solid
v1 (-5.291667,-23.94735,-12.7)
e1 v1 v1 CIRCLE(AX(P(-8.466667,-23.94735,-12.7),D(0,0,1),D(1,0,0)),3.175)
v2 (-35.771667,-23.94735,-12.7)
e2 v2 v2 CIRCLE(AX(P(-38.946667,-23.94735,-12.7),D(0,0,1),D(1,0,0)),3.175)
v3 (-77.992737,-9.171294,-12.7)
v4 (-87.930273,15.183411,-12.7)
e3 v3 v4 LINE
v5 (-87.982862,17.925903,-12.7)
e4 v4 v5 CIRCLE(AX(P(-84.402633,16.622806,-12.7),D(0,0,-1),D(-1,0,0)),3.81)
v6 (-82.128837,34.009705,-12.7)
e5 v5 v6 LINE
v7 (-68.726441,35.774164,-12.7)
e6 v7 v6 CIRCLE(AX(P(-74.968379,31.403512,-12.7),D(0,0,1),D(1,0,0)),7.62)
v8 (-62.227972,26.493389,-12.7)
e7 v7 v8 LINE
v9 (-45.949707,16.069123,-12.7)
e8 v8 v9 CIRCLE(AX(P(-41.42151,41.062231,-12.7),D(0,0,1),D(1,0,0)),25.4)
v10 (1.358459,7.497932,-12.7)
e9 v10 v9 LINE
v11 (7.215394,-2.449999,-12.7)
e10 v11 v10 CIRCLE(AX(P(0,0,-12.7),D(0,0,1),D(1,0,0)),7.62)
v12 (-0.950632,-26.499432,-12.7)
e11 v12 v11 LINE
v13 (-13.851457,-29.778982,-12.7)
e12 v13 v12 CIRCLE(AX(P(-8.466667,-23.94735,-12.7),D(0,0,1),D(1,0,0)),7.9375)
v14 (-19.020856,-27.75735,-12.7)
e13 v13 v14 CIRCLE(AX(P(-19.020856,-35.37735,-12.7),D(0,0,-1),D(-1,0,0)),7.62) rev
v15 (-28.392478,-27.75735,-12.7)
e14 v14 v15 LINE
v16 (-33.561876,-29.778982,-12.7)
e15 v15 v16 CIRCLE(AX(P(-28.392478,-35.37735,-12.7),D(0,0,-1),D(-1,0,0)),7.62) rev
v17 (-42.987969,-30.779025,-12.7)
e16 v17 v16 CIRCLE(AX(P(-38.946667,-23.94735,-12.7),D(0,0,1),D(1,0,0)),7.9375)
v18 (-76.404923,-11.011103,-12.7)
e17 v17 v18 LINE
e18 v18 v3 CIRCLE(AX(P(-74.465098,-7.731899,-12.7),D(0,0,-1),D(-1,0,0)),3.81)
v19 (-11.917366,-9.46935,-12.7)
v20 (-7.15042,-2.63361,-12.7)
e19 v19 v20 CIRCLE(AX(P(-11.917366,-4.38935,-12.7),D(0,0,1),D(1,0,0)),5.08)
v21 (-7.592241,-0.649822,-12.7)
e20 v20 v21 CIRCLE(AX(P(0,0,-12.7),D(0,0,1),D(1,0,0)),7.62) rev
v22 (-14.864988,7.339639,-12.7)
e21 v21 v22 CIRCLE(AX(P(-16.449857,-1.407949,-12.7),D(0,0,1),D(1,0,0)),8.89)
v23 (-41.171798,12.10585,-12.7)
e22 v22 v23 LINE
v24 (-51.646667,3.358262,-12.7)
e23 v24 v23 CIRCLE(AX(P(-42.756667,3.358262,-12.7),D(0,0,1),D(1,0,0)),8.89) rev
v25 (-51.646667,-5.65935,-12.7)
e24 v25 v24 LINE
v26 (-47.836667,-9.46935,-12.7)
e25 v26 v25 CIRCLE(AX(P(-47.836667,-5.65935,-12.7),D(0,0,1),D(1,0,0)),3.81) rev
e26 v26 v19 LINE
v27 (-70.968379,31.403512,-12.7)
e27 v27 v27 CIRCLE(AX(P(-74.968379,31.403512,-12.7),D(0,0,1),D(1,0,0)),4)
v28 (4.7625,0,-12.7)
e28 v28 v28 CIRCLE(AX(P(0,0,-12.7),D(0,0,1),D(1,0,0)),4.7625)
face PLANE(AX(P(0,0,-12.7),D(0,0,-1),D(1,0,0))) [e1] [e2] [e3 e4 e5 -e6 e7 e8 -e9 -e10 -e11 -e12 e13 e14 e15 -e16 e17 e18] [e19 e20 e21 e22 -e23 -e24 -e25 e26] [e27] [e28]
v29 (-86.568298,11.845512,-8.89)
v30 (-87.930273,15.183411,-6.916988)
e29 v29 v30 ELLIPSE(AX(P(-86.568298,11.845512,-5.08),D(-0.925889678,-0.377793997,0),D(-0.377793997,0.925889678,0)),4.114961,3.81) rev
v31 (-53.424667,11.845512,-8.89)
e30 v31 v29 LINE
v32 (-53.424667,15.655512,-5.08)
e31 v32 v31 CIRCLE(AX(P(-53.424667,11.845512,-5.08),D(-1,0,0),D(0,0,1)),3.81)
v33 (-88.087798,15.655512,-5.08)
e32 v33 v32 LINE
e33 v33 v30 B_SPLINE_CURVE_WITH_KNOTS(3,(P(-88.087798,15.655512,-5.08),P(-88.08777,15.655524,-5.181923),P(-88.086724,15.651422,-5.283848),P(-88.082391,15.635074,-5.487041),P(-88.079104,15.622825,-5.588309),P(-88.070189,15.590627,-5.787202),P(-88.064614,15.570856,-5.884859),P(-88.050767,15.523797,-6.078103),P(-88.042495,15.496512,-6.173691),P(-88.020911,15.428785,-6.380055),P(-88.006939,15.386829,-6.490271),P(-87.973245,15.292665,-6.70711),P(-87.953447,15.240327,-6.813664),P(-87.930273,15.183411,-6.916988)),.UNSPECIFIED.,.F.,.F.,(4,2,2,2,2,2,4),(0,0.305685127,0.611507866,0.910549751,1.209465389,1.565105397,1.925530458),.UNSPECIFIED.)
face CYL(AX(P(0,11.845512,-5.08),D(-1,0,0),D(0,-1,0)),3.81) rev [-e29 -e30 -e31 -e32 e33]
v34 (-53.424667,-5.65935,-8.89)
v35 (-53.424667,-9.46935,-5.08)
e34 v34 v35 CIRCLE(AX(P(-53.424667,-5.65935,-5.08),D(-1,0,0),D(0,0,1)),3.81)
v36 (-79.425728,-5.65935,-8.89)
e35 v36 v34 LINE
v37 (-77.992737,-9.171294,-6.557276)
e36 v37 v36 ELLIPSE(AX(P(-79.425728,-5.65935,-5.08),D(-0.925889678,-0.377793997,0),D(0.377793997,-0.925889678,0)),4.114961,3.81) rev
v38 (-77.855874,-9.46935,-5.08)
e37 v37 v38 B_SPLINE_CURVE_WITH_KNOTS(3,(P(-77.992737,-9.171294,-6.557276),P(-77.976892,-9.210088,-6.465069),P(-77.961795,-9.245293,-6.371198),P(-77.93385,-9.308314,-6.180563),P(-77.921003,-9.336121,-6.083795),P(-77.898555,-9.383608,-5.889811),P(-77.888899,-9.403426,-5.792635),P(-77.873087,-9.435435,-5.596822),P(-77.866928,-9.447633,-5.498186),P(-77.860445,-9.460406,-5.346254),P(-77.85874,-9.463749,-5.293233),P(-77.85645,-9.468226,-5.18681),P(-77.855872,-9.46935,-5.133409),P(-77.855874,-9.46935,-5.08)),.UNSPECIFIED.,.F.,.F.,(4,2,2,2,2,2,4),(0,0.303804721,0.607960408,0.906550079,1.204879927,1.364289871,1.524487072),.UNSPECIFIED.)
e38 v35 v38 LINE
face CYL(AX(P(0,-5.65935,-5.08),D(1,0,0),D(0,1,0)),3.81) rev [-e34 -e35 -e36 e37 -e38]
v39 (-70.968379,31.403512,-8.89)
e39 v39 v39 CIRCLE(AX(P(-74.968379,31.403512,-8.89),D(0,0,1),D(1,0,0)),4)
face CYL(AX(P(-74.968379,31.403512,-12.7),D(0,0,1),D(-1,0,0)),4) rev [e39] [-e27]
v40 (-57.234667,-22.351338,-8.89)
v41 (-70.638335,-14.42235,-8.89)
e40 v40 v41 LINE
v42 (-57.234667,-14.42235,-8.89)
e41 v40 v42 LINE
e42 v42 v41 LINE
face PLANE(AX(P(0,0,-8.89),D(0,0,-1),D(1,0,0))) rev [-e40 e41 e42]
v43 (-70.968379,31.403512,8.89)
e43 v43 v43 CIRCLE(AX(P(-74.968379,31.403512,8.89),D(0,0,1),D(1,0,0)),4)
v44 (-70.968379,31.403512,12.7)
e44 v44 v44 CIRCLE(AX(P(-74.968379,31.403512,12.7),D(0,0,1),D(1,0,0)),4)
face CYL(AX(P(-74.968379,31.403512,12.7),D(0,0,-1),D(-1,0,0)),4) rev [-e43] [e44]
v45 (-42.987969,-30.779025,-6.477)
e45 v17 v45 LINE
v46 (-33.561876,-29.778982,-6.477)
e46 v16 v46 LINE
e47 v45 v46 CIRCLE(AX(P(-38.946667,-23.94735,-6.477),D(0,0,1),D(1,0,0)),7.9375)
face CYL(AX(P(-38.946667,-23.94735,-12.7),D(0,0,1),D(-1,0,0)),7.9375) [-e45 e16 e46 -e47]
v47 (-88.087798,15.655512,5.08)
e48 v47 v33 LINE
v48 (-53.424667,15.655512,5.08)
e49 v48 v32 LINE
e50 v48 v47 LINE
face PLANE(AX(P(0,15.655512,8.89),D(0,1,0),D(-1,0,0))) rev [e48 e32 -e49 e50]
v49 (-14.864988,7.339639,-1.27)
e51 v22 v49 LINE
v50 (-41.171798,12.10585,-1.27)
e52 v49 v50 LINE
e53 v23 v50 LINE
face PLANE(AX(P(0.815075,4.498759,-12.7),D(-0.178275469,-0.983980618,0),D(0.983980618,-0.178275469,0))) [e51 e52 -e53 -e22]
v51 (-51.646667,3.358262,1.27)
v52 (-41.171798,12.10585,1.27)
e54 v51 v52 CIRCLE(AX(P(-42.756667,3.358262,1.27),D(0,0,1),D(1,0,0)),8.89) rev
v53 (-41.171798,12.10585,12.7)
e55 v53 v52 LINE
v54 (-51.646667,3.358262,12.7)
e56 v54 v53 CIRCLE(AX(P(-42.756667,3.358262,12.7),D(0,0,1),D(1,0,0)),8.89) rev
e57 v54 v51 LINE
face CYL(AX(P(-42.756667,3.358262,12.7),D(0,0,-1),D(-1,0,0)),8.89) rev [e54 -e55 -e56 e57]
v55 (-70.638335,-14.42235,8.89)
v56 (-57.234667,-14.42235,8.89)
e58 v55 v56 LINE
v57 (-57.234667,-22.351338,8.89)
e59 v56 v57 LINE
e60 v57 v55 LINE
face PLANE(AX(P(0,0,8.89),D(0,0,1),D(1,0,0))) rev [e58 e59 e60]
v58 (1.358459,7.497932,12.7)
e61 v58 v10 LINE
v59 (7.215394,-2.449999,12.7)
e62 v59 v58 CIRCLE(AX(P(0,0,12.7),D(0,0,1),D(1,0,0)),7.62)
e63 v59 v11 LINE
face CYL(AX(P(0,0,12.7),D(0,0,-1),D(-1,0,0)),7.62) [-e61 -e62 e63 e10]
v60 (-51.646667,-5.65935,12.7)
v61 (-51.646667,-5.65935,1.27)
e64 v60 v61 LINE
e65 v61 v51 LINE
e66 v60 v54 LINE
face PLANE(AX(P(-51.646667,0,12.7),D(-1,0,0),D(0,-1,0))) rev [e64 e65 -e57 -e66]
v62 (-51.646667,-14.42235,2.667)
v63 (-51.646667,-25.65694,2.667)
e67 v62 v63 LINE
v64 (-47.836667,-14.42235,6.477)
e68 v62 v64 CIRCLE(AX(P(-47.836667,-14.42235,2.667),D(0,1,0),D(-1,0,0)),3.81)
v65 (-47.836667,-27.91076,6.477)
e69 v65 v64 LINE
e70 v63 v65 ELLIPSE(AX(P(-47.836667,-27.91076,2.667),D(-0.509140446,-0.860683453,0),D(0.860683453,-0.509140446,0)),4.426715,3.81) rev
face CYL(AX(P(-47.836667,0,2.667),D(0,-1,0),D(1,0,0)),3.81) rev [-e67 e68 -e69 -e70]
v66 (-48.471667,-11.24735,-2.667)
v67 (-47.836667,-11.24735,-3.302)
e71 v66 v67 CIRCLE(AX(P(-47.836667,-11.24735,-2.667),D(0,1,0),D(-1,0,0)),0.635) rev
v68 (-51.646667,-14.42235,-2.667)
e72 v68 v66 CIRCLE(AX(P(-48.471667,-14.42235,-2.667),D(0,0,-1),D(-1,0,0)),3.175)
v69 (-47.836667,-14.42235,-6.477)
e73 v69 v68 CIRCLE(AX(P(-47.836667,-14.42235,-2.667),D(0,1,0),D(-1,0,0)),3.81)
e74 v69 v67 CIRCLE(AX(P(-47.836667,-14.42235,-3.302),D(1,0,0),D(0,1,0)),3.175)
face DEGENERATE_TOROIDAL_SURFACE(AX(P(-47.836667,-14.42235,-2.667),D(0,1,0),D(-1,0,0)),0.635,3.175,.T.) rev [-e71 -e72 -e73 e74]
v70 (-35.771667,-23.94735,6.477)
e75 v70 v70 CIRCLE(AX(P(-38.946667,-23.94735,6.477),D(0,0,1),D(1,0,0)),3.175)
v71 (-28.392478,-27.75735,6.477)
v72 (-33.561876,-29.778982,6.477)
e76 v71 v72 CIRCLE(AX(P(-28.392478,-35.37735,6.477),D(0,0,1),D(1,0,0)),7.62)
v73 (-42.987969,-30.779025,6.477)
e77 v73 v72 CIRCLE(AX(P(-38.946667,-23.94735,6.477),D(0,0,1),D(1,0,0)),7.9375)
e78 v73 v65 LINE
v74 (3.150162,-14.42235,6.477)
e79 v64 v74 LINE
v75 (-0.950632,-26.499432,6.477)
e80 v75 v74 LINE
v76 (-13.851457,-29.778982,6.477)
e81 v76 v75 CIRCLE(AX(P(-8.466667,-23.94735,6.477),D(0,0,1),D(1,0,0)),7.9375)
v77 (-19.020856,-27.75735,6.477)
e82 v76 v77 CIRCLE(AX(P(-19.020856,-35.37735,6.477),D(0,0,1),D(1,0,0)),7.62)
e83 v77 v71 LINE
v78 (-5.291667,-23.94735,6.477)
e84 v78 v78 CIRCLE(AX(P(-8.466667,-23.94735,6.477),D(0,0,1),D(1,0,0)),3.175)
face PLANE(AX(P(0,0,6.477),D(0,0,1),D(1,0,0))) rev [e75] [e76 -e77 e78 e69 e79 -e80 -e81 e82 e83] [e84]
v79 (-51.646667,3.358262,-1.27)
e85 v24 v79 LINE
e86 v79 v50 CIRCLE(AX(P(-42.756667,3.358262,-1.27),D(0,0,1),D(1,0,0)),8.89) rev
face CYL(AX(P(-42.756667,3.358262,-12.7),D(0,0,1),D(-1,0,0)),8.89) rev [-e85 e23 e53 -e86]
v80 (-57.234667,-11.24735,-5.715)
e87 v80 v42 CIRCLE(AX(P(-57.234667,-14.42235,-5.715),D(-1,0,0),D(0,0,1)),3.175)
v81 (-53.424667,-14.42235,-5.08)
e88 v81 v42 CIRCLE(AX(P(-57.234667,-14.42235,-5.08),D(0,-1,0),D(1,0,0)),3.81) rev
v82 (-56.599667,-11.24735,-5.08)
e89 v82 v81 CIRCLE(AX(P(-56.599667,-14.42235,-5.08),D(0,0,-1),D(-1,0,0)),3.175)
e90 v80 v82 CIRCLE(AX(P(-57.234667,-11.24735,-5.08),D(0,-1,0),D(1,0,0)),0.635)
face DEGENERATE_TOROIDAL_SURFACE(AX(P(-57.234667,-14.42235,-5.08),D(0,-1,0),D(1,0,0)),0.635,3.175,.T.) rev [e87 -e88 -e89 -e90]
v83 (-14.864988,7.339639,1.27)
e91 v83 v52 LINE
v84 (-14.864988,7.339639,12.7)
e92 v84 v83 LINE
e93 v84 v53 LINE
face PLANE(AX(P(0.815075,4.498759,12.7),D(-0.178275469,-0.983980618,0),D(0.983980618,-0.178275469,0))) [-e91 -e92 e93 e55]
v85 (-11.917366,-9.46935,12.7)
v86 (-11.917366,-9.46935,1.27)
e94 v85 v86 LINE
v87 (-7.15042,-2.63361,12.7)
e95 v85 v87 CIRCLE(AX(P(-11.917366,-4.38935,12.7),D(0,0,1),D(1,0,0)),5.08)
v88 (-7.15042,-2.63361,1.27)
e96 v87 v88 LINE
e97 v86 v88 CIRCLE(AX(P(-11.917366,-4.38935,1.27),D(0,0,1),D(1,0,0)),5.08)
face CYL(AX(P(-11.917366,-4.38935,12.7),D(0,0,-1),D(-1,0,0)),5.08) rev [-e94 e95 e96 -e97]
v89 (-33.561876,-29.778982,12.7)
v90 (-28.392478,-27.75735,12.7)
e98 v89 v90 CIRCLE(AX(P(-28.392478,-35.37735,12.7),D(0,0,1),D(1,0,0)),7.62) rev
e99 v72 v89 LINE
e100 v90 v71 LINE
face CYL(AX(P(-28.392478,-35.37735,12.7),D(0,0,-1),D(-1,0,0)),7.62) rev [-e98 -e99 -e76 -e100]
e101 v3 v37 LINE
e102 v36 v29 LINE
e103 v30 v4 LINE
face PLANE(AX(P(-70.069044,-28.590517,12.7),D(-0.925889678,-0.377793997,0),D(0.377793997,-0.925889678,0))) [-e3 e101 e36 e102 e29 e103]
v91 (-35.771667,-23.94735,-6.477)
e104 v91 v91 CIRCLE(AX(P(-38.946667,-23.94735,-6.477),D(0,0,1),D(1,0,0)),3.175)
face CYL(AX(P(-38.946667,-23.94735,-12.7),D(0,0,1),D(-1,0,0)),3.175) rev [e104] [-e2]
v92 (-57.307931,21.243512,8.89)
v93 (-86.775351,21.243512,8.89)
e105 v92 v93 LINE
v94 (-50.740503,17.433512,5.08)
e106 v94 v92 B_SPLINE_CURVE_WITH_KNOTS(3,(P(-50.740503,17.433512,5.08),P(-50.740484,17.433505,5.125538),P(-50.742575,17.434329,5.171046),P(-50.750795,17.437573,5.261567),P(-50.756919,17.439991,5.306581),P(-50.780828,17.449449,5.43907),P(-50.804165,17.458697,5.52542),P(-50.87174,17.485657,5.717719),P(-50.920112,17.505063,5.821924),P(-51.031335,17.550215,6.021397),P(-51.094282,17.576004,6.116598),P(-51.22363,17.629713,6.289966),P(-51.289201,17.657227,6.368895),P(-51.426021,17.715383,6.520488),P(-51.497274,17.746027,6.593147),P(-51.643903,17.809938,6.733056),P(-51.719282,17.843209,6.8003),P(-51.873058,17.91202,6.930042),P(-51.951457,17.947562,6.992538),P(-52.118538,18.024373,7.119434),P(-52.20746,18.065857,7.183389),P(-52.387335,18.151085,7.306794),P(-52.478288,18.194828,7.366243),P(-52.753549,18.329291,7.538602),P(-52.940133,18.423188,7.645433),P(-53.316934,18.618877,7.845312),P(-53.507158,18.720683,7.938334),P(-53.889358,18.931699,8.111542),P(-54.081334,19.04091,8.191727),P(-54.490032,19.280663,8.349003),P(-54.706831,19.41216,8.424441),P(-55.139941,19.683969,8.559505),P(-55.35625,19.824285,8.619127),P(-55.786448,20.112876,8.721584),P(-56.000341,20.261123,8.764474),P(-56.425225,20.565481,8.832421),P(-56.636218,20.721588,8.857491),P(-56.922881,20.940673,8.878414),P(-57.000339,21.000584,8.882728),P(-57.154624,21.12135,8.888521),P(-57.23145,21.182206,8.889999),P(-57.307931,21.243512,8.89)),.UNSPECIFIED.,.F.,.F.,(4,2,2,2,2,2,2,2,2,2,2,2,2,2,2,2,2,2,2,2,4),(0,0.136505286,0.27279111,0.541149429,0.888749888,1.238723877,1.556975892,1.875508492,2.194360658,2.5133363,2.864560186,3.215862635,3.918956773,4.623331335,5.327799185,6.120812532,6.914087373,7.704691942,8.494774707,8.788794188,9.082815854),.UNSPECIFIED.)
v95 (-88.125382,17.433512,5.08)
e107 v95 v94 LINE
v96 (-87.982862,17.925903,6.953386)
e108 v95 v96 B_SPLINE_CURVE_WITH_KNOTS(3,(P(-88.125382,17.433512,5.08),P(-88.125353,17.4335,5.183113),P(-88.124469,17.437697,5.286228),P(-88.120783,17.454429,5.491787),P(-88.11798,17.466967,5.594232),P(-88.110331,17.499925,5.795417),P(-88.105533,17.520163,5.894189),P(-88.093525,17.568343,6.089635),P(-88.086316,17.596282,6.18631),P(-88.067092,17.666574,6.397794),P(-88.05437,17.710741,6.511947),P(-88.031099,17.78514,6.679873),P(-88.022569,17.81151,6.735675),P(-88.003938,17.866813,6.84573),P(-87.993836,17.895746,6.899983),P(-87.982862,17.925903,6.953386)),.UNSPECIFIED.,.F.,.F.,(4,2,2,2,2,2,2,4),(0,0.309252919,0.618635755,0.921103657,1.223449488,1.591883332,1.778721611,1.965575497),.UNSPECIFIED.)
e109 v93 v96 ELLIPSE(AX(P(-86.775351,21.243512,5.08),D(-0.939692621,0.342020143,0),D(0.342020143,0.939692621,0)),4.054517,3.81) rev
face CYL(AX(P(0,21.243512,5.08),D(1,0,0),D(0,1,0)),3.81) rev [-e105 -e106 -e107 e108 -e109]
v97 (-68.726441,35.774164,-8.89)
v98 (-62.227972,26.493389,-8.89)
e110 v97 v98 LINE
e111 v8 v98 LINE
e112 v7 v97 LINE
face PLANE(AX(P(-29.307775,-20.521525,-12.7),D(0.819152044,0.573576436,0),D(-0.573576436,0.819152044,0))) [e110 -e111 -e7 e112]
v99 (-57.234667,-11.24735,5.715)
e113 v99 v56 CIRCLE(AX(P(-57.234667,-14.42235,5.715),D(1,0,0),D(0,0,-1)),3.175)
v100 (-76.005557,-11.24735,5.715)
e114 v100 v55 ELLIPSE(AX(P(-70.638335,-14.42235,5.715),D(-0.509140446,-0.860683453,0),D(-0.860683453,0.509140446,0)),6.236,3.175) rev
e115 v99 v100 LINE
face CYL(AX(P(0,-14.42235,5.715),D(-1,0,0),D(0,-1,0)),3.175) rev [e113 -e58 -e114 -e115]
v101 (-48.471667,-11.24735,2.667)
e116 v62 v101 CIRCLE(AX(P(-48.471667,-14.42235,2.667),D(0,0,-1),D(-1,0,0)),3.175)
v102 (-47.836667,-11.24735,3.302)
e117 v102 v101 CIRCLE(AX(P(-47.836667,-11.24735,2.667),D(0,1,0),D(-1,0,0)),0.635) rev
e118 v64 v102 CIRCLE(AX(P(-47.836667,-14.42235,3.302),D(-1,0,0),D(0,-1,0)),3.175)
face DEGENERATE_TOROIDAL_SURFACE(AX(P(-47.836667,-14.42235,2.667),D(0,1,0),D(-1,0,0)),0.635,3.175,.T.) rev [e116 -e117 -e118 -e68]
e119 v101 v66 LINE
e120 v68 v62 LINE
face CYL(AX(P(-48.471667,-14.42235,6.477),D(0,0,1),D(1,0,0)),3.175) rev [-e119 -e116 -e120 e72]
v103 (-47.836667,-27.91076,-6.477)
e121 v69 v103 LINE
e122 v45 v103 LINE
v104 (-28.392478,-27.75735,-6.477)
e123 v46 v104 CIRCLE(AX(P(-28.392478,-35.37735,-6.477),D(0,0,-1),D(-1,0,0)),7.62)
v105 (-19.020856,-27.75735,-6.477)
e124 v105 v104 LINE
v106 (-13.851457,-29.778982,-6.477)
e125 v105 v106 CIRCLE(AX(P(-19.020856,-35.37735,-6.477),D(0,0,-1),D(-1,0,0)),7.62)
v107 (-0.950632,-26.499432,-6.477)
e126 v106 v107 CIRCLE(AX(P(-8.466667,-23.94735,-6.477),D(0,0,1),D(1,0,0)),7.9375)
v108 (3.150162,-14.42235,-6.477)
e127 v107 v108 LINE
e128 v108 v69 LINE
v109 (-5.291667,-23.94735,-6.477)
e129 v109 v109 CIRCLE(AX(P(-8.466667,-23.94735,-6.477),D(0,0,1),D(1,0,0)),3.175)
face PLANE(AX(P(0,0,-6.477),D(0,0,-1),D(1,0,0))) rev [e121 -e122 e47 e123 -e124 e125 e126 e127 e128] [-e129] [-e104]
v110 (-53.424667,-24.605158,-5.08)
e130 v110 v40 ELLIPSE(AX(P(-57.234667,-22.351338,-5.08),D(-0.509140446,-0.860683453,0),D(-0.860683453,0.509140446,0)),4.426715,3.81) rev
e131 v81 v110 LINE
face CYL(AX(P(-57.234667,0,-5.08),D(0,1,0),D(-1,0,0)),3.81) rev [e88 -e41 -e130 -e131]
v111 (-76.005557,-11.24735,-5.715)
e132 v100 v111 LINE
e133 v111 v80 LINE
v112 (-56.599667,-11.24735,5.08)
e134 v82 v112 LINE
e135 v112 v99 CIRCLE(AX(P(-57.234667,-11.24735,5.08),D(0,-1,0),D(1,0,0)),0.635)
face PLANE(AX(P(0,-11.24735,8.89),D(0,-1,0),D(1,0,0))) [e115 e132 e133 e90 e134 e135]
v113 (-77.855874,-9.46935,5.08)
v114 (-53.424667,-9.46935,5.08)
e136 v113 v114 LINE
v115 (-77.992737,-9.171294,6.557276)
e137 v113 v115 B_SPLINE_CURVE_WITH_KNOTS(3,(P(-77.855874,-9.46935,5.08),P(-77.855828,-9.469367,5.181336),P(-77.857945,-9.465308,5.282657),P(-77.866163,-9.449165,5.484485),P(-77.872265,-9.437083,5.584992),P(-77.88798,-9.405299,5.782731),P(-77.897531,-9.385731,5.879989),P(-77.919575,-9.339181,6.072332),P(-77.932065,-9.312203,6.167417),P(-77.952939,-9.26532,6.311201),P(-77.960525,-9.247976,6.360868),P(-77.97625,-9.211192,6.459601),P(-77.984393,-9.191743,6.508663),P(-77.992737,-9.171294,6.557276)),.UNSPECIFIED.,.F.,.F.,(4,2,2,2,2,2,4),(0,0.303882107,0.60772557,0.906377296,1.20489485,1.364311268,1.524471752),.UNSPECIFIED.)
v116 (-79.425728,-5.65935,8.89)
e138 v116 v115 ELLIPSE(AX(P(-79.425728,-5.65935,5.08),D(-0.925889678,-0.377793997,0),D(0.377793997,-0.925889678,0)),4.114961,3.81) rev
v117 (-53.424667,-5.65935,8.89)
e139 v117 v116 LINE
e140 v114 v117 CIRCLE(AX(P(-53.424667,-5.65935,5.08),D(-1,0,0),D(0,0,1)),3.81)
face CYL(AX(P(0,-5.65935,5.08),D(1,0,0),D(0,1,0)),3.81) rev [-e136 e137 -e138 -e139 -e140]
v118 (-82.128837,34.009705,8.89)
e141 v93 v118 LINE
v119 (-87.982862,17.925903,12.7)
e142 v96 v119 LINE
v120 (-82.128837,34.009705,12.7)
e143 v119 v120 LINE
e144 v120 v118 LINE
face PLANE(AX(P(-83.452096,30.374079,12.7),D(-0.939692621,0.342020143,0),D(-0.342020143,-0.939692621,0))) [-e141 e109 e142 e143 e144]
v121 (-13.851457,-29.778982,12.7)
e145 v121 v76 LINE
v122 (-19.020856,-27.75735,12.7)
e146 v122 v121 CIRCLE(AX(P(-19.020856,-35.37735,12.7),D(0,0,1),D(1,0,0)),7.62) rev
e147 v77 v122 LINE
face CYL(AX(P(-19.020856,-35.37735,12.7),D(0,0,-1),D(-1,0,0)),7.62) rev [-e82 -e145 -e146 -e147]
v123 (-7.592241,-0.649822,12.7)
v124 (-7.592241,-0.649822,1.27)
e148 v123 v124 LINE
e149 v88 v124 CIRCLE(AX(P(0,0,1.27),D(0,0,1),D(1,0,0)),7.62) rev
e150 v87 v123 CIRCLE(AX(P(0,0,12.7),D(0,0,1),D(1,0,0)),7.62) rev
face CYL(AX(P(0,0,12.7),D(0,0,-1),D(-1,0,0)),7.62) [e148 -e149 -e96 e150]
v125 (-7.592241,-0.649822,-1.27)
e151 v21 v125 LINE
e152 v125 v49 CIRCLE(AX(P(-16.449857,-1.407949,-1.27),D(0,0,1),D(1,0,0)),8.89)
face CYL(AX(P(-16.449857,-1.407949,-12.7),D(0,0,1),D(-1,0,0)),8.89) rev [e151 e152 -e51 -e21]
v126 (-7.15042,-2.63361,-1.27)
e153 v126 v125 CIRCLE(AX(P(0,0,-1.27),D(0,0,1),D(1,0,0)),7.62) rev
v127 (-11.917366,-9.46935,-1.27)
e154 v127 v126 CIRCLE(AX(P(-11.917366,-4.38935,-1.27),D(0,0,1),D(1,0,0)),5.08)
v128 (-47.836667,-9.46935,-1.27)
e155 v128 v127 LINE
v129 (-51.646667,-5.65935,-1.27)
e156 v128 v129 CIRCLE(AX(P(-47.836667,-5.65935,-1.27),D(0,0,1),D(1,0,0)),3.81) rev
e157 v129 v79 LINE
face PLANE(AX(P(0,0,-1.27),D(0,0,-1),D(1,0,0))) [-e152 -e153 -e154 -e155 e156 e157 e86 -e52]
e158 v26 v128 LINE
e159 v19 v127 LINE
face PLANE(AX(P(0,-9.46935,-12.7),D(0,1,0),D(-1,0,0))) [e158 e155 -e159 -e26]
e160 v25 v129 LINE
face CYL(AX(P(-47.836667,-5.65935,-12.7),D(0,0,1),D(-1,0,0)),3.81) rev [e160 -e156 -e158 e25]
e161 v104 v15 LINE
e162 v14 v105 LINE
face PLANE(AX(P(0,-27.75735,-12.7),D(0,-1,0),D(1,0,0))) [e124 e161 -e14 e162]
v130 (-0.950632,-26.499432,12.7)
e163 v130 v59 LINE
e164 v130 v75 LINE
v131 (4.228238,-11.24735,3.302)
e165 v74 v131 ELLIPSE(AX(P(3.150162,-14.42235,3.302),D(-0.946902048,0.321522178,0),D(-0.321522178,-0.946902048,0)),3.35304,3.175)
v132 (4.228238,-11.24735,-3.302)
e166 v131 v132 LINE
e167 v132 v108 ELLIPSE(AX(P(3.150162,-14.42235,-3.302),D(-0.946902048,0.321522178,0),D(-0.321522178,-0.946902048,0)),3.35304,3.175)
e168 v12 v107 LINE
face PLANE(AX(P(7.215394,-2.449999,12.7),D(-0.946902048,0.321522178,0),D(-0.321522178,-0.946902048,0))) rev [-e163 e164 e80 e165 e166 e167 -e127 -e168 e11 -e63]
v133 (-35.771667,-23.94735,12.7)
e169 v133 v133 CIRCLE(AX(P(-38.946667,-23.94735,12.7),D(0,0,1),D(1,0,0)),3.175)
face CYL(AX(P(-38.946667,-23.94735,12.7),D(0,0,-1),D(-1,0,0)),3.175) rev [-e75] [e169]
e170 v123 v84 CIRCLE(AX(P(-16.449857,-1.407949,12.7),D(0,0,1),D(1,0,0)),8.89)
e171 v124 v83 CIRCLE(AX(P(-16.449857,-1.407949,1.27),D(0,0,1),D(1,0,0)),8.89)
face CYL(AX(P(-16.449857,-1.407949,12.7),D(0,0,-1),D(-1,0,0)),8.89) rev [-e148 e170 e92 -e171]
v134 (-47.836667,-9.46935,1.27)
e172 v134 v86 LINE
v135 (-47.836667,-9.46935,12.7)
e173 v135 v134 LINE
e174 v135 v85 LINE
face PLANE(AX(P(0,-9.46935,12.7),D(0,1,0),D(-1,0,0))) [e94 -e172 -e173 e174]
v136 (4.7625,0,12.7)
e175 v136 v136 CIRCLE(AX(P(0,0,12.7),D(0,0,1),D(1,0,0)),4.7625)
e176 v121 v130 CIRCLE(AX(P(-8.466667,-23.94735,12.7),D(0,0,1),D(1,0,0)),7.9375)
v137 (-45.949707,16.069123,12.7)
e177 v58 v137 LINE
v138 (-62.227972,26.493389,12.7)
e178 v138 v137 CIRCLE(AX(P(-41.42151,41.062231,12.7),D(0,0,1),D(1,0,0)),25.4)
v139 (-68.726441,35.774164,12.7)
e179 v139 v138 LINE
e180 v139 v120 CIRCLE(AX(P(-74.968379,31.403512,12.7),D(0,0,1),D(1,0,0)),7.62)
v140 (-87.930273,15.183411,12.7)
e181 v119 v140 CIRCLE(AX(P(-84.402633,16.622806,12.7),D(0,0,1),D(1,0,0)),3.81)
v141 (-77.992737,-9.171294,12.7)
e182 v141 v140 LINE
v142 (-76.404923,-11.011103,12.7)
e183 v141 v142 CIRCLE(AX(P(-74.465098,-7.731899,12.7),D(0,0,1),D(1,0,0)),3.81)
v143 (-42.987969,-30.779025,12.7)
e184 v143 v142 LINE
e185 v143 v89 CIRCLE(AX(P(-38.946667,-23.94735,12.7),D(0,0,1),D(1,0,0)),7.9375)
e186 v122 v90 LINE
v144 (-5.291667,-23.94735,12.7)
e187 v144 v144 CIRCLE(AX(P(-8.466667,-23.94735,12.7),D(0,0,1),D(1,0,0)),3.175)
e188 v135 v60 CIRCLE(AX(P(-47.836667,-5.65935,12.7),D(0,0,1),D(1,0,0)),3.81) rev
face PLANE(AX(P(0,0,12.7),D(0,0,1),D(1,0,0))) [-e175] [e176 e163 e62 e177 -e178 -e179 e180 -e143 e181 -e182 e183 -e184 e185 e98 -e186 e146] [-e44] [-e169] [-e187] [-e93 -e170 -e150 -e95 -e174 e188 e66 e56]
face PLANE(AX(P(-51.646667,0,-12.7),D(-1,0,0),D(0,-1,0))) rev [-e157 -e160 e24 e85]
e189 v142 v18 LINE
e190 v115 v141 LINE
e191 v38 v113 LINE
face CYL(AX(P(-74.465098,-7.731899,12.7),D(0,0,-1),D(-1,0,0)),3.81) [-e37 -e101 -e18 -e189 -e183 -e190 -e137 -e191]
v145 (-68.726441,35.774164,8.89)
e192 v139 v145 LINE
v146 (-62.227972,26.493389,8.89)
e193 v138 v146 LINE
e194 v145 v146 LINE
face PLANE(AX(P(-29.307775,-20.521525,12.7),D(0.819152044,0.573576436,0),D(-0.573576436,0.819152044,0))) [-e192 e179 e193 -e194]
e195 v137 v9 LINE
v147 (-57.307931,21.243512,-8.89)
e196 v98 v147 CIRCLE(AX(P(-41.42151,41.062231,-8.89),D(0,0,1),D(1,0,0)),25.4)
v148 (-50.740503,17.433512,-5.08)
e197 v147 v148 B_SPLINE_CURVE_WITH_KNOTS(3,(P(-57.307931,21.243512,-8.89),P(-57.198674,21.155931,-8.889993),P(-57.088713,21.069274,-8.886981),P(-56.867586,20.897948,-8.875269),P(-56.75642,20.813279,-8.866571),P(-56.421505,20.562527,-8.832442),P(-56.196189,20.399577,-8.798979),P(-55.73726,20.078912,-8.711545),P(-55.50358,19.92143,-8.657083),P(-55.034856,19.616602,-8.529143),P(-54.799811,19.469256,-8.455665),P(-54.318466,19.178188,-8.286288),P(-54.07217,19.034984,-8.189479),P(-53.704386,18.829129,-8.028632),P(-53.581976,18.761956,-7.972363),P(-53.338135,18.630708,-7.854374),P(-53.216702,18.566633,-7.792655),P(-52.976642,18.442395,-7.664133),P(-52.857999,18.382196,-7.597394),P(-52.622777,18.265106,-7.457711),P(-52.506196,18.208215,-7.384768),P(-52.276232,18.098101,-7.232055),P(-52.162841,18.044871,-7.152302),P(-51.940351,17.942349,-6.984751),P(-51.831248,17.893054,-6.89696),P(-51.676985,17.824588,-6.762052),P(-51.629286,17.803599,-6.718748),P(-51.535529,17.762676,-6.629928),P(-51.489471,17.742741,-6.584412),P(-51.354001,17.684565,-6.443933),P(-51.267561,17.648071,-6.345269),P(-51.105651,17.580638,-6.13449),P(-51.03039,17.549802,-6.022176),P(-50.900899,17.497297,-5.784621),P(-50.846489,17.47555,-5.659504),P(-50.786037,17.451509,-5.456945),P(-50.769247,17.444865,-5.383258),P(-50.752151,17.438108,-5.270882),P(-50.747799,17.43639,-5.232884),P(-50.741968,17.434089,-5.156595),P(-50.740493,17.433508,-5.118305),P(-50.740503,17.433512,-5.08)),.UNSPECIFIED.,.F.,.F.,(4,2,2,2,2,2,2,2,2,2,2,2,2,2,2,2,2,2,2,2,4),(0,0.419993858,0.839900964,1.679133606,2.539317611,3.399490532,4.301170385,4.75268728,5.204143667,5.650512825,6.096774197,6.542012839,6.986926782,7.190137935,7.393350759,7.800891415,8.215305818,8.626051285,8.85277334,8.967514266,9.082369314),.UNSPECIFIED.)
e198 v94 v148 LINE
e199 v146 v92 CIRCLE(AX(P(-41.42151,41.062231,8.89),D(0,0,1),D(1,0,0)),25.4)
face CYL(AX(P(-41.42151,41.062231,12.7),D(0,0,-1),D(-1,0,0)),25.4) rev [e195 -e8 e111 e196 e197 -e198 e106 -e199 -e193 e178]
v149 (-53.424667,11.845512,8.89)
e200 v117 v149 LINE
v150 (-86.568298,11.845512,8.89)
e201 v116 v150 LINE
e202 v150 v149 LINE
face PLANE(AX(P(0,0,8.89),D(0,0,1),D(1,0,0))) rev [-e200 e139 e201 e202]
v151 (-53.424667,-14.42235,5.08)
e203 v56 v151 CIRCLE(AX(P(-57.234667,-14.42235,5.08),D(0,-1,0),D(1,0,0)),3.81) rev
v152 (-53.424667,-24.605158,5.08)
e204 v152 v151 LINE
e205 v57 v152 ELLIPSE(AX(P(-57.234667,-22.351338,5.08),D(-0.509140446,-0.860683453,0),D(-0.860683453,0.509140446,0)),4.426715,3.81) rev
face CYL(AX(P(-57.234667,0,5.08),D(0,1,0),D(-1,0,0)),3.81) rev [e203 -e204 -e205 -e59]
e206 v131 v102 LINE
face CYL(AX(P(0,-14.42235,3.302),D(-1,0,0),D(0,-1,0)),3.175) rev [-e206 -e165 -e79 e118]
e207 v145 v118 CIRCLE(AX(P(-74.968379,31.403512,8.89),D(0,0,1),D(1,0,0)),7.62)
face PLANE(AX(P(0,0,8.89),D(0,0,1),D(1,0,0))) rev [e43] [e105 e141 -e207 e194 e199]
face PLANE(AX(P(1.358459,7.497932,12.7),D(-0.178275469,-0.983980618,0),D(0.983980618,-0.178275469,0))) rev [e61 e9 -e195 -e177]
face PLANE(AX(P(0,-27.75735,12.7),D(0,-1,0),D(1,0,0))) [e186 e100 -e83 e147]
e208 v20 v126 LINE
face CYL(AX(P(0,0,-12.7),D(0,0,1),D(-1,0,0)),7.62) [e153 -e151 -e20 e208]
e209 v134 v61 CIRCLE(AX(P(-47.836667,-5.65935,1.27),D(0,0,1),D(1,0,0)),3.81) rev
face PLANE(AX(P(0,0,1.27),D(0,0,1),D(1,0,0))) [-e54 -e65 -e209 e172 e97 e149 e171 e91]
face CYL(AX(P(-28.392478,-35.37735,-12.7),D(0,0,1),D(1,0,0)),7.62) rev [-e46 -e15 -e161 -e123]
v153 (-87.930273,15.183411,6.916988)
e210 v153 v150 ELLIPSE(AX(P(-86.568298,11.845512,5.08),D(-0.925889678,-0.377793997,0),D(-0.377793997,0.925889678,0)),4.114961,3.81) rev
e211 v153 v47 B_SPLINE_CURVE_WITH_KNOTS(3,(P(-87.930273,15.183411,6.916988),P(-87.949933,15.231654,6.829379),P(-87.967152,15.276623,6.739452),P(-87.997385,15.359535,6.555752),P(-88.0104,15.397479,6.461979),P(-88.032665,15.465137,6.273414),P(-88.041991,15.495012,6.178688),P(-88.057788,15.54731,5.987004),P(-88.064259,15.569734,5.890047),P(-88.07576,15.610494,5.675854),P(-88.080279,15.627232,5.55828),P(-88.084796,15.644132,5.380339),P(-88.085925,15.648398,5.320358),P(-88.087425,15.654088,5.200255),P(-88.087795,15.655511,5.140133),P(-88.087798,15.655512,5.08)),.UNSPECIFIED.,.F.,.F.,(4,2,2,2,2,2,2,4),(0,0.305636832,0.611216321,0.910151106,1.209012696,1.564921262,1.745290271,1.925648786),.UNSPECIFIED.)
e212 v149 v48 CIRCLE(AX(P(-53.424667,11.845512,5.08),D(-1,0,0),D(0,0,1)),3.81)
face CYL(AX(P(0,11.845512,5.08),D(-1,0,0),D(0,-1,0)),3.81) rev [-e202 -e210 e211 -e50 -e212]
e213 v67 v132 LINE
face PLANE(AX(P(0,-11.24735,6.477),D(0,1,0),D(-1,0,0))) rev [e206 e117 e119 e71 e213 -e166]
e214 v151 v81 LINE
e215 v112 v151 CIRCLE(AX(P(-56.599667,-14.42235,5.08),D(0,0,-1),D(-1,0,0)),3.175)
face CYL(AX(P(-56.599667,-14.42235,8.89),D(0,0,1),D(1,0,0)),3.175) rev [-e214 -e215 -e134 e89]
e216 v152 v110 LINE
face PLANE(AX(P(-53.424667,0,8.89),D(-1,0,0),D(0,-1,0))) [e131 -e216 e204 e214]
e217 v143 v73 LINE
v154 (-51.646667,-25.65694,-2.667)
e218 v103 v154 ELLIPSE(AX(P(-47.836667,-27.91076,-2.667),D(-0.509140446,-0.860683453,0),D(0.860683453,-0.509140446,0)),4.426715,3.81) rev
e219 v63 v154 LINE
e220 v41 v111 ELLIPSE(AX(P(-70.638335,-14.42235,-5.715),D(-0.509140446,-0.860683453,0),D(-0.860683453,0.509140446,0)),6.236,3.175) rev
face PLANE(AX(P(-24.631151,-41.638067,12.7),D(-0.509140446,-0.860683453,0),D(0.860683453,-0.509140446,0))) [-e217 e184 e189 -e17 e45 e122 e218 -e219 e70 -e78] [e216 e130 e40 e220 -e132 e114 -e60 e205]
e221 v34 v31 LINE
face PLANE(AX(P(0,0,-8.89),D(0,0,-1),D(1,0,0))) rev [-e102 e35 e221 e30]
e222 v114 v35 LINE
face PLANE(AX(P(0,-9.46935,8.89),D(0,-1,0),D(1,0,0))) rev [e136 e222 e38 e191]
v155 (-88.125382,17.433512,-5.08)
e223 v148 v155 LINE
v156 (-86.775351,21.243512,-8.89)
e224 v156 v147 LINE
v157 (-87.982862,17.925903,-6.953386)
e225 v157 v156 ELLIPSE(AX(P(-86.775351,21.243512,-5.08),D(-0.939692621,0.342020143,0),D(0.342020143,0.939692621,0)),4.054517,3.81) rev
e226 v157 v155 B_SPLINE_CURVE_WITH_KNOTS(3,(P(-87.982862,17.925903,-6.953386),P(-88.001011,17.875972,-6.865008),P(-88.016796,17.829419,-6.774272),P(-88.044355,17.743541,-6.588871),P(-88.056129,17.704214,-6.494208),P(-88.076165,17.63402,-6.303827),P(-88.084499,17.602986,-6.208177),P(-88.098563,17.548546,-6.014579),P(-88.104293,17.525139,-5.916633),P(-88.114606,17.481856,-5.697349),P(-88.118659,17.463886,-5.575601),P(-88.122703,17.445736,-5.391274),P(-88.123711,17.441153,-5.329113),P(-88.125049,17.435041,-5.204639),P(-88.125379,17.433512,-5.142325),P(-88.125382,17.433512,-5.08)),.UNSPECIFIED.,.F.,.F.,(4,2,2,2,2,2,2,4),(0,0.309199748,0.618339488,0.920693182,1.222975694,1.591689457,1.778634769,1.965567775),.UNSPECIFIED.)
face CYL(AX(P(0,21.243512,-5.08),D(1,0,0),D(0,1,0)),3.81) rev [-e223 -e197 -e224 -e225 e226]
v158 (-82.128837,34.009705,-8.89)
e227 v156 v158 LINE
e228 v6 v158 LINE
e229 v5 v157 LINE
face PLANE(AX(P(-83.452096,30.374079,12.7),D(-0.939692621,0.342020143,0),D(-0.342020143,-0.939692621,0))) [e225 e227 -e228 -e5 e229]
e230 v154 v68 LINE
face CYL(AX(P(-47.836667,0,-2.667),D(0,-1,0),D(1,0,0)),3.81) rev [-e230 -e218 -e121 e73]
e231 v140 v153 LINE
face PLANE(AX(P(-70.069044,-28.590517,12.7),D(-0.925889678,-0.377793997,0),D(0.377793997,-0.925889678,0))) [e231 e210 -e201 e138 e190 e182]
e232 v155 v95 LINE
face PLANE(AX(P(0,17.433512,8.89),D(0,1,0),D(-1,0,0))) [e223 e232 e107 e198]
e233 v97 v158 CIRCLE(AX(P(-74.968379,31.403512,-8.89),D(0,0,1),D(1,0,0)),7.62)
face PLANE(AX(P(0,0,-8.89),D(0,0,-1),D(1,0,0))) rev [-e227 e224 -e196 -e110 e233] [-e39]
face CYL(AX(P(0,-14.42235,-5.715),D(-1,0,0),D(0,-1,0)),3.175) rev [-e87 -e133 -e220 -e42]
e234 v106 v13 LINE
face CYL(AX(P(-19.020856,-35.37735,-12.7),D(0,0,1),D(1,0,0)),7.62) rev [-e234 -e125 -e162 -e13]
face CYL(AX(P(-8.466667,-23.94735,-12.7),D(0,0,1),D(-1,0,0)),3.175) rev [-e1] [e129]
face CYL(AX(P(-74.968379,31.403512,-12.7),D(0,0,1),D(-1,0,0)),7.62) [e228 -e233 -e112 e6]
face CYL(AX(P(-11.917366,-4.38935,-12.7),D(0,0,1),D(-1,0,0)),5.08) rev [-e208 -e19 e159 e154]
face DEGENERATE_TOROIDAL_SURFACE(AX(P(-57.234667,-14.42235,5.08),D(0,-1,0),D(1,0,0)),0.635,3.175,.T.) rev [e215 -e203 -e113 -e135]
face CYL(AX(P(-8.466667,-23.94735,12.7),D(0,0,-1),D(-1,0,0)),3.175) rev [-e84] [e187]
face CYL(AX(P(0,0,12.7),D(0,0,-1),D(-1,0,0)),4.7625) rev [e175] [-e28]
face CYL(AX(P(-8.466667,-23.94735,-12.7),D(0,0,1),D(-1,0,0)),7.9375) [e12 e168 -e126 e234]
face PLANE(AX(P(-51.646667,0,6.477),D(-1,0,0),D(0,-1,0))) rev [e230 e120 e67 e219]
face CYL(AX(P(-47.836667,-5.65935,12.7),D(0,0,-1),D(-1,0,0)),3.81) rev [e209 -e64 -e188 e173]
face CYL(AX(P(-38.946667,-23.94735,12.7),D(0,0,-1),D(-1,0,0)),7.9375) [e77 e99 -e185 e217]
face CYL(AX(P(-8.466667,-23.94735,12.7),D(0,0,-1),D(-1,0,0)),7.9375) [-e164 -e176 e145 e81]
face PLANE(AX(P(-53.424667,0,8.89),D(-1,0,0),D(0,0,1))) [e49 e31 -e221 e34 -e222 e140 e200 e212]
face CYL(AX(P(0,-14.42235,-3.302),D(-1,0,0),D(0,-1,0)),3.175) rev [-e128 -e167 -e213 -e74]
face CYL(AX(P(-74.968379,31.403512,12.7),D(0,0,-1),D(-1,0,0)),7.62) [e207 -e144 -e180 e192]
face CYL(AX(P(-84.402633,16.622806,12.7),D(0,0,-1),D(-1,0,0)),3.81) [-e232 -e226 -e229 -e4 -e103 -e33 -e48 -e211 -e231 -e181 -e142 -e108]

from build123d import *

# Parameters (mm, degrees)
SKETCH1_R           = 4.7625
SKETCH1_R_2         = 4
SKETCH1_R_3         = 3.175
BOSS_EXTRUDE1_DEPTH = 12.7
BOSS_EXTRUDE2_DEPTH = 1.27
SKETCH1_6_R         = 3.175
CUT_EXTRUDE1_DEPTH  = 6.477
SKETCH1_10_R        = 4
CUT_EXTRUDE3_DEPTH  = 8.89
FILLET1_R           = 3.81
FILLET3_R           = 3.81
FILLET4_R           = 3.175
FILLET5_R           = 7.62


with BuildPart() as part:
    # Sketch1 → Boss-Extrude1 (new body)
    with BuildSketch(Plane(origin=(0, 0, 0), x_dir=(0, 1, 0), z_dir=(0, 0, 1))):
        with BuildLine():
            Line((-26.499431941, 0.950631657), (-2.449998994, -7.215393609))
            ThreePointArc((-2.449998994, -7.215393609), (3.866048142, -6.56643524), (7.497932311, -1.358459074))
            Line((7.497932311, -1.358459074), (16.069122988, 45.94970705))
            ThreePointArc((16.069122988, 45.94970705), (19.672222889, 55.119231342), (26.493389209, 62.227972063))
            Line((26.493389209, 62.227972063), (35.774163974, 68.726440514))
            ThreePointArc((35.774163974, 68.726440514), (38.958321373, 75.962988676), (34.009705021, 82.128836862))
            Line((34.009705021, 82.128836862), (16.544511529, 88.485647429))
            Line((16.544511529, 88.485647429), (-10.358349656, 77.508379092))
            Line((-10.358349656, 77.508379092), (-30.779024566, 42.987968953))
            ThreePointArc((-30.779024566, 42.987968953), (-31.601546647, 36.844959103), (-27.757349656, 31.983348043))
            Line((-27.757349656, 31.983348043), (-27.757349656, 15.42998529))
            ThreePointArc((-27.757349656, 15.42998529), (-31.855063811, 7.779670964), (-26.499431941, 0.950631657))
        make_face()
        with Locations(Location((0, 0, 0), (0, 0, 270))):
            Circle(SKETCH1_R, mode=Mode.SUBTRACT)
        with Locations(Location((31.403511529, 74.968379092, 0), (0, 0, 270))):
            Circle(SKETCH1_R_2, mode=Mode.SUBTRACT)
        with Locations(Location((-23.947349656, 38.946666667, 0), (0, 0, 270))):
            Circle(SKETCH1_R_3, mode=Mode.SUBTRACT)
        with Locations(Location((-23.947349656, 8.466666667, 0), (0, 0, 270))):
            Circle(SKETCH1_R_3, mode=Mode.SUBTRACT)
        with BuildLine():
            Line((-9.469349656, 47.836666667), (-9.469349656, 11.917365883))
            ThreePointArc((-9.469349656, 11.917365883), (-7.295140555, 7.750499045), (-2.633609794, 7.15041953))
            ThreePointArc((-2.633609794, 7.15041953), (-1.656512431, 7.437766235), (-0.649822418, 7.592241489))
            ThreePointArc((-0.649822418, 7.592241489), (4.576435948, 9.875722251), (7.339639123, 14.86498764))
            Line((7.339639123, 14.86498764), (12.10584978, 41.171797748))
            ThreePointArc((12.10584978, 41.171797748), (10.181808987, 48.455026751), (3.358262084, 51.646666667))
            Line((3.358262084, 51.646666667), (-5.659349656, 51.646666667))
            ThreePointArc((-5.659349656, 51.646666667), (-8.353426493, 50.530743503), (-9.469349656, 47.836666667))
        make_face(mode=Mode.SUBTRACT)
    extrude(amount=BOSS_EXTRUDE1_DEPTH)

    # Sketch1<4> → Boss-Extrude2 (add)
    with BuildSketch(Plane(origin=(0, 0, 0), x_dir=(0, 1, 0), z_dir=(0, 0, 1))):
        with BuildLine():
            ThreePointArc((-5.659349656, 51.646666667), (-8.353426493, 50.530743503), (-9.469349656, 47.836666667))
            Line((-9.469349656, 47.836666667), (-9.469349656, 11.917365883))
            ThreePointArc((-9.469349656, 11.917365883), (-7.295140555, 7.750499045), (-2.633609794, 7.15041953))
            ThreePointArc((-2.633609794, 7.15041953), (-1.656512431, 7.437766235), (-0.649822418, 7.592241489))
            ThreePointArc((-0.649822418, 7.592241489), (4.576435948, 9.875722251), (7.339639123, 14.86498764))
            Line((7.339639123, 14.86498764), (12.10584978, 41.171797748))
            ThreePointArc((12.10584978, 41.171797748), (10.181808987, 48.455026751), (3.358262084, 51.646666667))
            Line((3.358262084, 51.646666667), (-5.659349656, 51.646666667))
        make_face()
    extrude(amount=BOSS_EXTRUDE2_DEPTH)

    # Sketch1<6> → Cut-Extrude1 (cut)
    with BuildSketch(Plane(origin=(0, 0, 0), x_dir=(0, 1, 0), z_dir=(0, 0, 1))):
        with BuildLine():
            ThreePointArc((-27.757349656, 15.42998529), (-31.855063811, 7.779670964), (-26.499431941, 0.950631657))
            Line((-26.499431941, 0.950631657), (-11.247349656, -4.228238446))
            Line((-11.247349656, -4.228238446), (-11.247349656, 51.646666667))
            Line((-11.247349656, 51.646666667), (-25.656940256, 51.646666667))
            Line((-25.656940256, 51.646666667), (-30.779024566, 42.987968953))
            ThreePointArc((-30.779024566, 42.987968953), (-31.601546647, 36.844959103), (-27.757349656, 31.983348043))
            Line((-27.757349656, 31.983348043), (-27.757349656, 15.42998529))
        make_face()
        with Locations(Location((-23.947349656, 8.466666667, 0), (0, 0, 270))):
            Circle(SKETCH1_6_R, mode=Mode.SUBTRACT)
        with Locations(Location((-23.947349656, 38.946666667, 0), (0, 0, 270))):
            Circle(SKETCH1_6_R, mode=Mode.SUBTRACT)
    extrude(amount=CUT_EXTRUDE1_DEPTH, mode=Mode.SUBTRACT)

    # Sketch1<10> → Cut-Extrude3 (cut)
    # profile 1 of 3: a face of its own
    with BuildSketch(Plane(origin=(0, 0, 0), x_dir=(0, 1, 0), z_dir=(0, 0, 1))):
        with BuildLine():
            Line((17.433511529, 88.162077891), (17.433511529, 50.740503147))
            ThreePointArc((17.433511529, 50.740503147), (21.118462359, 57.150658387), (26.493389209, 62.227972063))
            Line((26.493389209, 62.227972063), (35.774163974, 68.726440514))
            ThreePointArc((35.774163974, 68.726440514), (38.958321373, 75.962988676), (34.009705021, 82.128836862))
            Line((34.009705021, 82.128836862), (17.433511529, 88.162077891))
        make_face()
        with Locations(Location((31.403511529, 74.968379092, 0), (0, 0, 270))):
            Circle(SKETCH1_10_R, mode=Mode.SUBTRACT)
    # profile 2 of 3: a face of its own
    with BuildSketch(Plane(origin=(0, 0, 0), x_dir=(0, 1, 0), z_dir=(0, 0, 1))):
        Polygon((-11.247349656, 76.005556842), (-24.605157851, 53.424666667), (-11.247349656, 53.424666667), align=None)
    # profile 3 of 3: a face of its own
    with BuildSketch(Plane(origin=(0, 0, 0), x_dir=(0, 1, 0), z_dir=(0, 0, 1))):
        Polygon((15.655511529, 88.122905656), (-9.469349656, 77.871120864), (-9.469349656, 53.424666667), (15.655511529, 53.424666667), align=None)
    extrude(amount=CUT_EXTRUDE3_DEPTH, mode=Mode.SUBTRACT)

    # Mirror1: part across face


with BuildPart() as part_1:
    add(part.part)
    add(part.part.mirror(Plane(origin=(-30.744300958, 0.707665305, 0), x_dir=(1, 0, 0), z_dir=(0, 0, -1))))

    # Fillet1
    fillet1_edges = [part_1.edges().sort_by_distance(p)[0] for p in [
        (-69.451290519, 17.433511529, 8.89),
        (-51.646666667, -18.452144956, 6.477),
        (-51.646666667, -18.452144956, -6.477),
        (-53.424666667, -17.926253754, 8.89),
        (-53.424666667, -17.926253754, -8.89),
        (-70.773786162, 15.655511529, 8.89),
        (-65.647893765, -9.469349656, 8.89),
        (-65.647893765, -9.469349656, -8.89),
        (-70.773786162, 15.655511529, -8.89),
        (-69.451290519, 17.433511529, -8.89),
    ]]
    fillet(fillet1_edges, radius=FILLET1_R)

    # Fillet3
    # the kernel refuses this fillet: 3.81 mm, written as the material it takes off along each edge
    with BuildSketch(Plane(origin=(-77.508379092, -10.358349656, -15.90517458), x_dir=(-0.3777939966211631, 0.9258896781566412, 0), z_dir=(0, 0, 1))) as fillet3_piece_1:
        with BuildLine():
            CenterArc((FILLET3_R * 0.336501268256, -FILLET3_R), FILLET3_R, 90, 37.196303294)
            Line((-FILLET3_R * 0.268046453486, -FILLET3_R * 0.203431075087), (0, 0))
            Line((0, 0), (FILLET3_R * 0.336501268256, 0))
        make_face()
    extrude(amount=31.81034916, mode=Mode.SUBTRACT)
    with BuildSketch(Plane(origin=(-88.485647429, 16.544511529, -16.375115103), x_dir=(0.3420201433256622, 0.9396926207859108, 0), z_dir=(0, 0, 1))) as fillet3_piece_2:
        with BuildLine():
            CenterArc((FILLET3_R * 0.385838855973, -FILLET3_R), FILLET3_R, 90, 42.197104506)
            Line((-FILLET3_R * 0.285844295256, -FILLET3_R * 0.259161458646), (0, 0))
            Line((0, 0), (FILLET3_R * 0.385838855973, 0))
        make_face()
    extrude(amount=32.750230206, mode=Mode.SUBTRACT)

    # Fillet4
    fillet4_edges = [part_1.edges().sort_by_distance(p)[0] for p in [
        (-53.424666667, -11.247349656, 0),
        (-66.620111754, -11.247349656, -8.89),
        (-66.620111754, -11.247349656, 8.89),
        (-54.54058983, -11.247349656, -7.774076836),
        (-54.54058983, -11.247349656, 7.774076836),
        (-21.80421411, -11.247349656, 6.477),
        (-51.646666667, -11.247349656, 0),
        (-21.80421411, -11.247349656, -6.477),
        (-50.530743503, -11.247349656, -5.361076836),
        (-50.530743503, -11.247349656, 5.361076836),
    ]]
    fillet(fillet4_edges, radius=FILLET4_R)

    # Fillet5
    fillet5_edges = [part_1.edges().sort_by_distance(p)[0] for p in [
        (-31.983348043, -27.757349656, -9.5885),
        (-15.42998529, -27.757349656, -9.5885),
        (-15.42998529, -27.757349656, 9.5885),
        (-31.983348043, -27.757349656, 9.5885),
    ]]
    fillet(fillet5_edges, radius=FILLET5_R)


solid = part_1.part
